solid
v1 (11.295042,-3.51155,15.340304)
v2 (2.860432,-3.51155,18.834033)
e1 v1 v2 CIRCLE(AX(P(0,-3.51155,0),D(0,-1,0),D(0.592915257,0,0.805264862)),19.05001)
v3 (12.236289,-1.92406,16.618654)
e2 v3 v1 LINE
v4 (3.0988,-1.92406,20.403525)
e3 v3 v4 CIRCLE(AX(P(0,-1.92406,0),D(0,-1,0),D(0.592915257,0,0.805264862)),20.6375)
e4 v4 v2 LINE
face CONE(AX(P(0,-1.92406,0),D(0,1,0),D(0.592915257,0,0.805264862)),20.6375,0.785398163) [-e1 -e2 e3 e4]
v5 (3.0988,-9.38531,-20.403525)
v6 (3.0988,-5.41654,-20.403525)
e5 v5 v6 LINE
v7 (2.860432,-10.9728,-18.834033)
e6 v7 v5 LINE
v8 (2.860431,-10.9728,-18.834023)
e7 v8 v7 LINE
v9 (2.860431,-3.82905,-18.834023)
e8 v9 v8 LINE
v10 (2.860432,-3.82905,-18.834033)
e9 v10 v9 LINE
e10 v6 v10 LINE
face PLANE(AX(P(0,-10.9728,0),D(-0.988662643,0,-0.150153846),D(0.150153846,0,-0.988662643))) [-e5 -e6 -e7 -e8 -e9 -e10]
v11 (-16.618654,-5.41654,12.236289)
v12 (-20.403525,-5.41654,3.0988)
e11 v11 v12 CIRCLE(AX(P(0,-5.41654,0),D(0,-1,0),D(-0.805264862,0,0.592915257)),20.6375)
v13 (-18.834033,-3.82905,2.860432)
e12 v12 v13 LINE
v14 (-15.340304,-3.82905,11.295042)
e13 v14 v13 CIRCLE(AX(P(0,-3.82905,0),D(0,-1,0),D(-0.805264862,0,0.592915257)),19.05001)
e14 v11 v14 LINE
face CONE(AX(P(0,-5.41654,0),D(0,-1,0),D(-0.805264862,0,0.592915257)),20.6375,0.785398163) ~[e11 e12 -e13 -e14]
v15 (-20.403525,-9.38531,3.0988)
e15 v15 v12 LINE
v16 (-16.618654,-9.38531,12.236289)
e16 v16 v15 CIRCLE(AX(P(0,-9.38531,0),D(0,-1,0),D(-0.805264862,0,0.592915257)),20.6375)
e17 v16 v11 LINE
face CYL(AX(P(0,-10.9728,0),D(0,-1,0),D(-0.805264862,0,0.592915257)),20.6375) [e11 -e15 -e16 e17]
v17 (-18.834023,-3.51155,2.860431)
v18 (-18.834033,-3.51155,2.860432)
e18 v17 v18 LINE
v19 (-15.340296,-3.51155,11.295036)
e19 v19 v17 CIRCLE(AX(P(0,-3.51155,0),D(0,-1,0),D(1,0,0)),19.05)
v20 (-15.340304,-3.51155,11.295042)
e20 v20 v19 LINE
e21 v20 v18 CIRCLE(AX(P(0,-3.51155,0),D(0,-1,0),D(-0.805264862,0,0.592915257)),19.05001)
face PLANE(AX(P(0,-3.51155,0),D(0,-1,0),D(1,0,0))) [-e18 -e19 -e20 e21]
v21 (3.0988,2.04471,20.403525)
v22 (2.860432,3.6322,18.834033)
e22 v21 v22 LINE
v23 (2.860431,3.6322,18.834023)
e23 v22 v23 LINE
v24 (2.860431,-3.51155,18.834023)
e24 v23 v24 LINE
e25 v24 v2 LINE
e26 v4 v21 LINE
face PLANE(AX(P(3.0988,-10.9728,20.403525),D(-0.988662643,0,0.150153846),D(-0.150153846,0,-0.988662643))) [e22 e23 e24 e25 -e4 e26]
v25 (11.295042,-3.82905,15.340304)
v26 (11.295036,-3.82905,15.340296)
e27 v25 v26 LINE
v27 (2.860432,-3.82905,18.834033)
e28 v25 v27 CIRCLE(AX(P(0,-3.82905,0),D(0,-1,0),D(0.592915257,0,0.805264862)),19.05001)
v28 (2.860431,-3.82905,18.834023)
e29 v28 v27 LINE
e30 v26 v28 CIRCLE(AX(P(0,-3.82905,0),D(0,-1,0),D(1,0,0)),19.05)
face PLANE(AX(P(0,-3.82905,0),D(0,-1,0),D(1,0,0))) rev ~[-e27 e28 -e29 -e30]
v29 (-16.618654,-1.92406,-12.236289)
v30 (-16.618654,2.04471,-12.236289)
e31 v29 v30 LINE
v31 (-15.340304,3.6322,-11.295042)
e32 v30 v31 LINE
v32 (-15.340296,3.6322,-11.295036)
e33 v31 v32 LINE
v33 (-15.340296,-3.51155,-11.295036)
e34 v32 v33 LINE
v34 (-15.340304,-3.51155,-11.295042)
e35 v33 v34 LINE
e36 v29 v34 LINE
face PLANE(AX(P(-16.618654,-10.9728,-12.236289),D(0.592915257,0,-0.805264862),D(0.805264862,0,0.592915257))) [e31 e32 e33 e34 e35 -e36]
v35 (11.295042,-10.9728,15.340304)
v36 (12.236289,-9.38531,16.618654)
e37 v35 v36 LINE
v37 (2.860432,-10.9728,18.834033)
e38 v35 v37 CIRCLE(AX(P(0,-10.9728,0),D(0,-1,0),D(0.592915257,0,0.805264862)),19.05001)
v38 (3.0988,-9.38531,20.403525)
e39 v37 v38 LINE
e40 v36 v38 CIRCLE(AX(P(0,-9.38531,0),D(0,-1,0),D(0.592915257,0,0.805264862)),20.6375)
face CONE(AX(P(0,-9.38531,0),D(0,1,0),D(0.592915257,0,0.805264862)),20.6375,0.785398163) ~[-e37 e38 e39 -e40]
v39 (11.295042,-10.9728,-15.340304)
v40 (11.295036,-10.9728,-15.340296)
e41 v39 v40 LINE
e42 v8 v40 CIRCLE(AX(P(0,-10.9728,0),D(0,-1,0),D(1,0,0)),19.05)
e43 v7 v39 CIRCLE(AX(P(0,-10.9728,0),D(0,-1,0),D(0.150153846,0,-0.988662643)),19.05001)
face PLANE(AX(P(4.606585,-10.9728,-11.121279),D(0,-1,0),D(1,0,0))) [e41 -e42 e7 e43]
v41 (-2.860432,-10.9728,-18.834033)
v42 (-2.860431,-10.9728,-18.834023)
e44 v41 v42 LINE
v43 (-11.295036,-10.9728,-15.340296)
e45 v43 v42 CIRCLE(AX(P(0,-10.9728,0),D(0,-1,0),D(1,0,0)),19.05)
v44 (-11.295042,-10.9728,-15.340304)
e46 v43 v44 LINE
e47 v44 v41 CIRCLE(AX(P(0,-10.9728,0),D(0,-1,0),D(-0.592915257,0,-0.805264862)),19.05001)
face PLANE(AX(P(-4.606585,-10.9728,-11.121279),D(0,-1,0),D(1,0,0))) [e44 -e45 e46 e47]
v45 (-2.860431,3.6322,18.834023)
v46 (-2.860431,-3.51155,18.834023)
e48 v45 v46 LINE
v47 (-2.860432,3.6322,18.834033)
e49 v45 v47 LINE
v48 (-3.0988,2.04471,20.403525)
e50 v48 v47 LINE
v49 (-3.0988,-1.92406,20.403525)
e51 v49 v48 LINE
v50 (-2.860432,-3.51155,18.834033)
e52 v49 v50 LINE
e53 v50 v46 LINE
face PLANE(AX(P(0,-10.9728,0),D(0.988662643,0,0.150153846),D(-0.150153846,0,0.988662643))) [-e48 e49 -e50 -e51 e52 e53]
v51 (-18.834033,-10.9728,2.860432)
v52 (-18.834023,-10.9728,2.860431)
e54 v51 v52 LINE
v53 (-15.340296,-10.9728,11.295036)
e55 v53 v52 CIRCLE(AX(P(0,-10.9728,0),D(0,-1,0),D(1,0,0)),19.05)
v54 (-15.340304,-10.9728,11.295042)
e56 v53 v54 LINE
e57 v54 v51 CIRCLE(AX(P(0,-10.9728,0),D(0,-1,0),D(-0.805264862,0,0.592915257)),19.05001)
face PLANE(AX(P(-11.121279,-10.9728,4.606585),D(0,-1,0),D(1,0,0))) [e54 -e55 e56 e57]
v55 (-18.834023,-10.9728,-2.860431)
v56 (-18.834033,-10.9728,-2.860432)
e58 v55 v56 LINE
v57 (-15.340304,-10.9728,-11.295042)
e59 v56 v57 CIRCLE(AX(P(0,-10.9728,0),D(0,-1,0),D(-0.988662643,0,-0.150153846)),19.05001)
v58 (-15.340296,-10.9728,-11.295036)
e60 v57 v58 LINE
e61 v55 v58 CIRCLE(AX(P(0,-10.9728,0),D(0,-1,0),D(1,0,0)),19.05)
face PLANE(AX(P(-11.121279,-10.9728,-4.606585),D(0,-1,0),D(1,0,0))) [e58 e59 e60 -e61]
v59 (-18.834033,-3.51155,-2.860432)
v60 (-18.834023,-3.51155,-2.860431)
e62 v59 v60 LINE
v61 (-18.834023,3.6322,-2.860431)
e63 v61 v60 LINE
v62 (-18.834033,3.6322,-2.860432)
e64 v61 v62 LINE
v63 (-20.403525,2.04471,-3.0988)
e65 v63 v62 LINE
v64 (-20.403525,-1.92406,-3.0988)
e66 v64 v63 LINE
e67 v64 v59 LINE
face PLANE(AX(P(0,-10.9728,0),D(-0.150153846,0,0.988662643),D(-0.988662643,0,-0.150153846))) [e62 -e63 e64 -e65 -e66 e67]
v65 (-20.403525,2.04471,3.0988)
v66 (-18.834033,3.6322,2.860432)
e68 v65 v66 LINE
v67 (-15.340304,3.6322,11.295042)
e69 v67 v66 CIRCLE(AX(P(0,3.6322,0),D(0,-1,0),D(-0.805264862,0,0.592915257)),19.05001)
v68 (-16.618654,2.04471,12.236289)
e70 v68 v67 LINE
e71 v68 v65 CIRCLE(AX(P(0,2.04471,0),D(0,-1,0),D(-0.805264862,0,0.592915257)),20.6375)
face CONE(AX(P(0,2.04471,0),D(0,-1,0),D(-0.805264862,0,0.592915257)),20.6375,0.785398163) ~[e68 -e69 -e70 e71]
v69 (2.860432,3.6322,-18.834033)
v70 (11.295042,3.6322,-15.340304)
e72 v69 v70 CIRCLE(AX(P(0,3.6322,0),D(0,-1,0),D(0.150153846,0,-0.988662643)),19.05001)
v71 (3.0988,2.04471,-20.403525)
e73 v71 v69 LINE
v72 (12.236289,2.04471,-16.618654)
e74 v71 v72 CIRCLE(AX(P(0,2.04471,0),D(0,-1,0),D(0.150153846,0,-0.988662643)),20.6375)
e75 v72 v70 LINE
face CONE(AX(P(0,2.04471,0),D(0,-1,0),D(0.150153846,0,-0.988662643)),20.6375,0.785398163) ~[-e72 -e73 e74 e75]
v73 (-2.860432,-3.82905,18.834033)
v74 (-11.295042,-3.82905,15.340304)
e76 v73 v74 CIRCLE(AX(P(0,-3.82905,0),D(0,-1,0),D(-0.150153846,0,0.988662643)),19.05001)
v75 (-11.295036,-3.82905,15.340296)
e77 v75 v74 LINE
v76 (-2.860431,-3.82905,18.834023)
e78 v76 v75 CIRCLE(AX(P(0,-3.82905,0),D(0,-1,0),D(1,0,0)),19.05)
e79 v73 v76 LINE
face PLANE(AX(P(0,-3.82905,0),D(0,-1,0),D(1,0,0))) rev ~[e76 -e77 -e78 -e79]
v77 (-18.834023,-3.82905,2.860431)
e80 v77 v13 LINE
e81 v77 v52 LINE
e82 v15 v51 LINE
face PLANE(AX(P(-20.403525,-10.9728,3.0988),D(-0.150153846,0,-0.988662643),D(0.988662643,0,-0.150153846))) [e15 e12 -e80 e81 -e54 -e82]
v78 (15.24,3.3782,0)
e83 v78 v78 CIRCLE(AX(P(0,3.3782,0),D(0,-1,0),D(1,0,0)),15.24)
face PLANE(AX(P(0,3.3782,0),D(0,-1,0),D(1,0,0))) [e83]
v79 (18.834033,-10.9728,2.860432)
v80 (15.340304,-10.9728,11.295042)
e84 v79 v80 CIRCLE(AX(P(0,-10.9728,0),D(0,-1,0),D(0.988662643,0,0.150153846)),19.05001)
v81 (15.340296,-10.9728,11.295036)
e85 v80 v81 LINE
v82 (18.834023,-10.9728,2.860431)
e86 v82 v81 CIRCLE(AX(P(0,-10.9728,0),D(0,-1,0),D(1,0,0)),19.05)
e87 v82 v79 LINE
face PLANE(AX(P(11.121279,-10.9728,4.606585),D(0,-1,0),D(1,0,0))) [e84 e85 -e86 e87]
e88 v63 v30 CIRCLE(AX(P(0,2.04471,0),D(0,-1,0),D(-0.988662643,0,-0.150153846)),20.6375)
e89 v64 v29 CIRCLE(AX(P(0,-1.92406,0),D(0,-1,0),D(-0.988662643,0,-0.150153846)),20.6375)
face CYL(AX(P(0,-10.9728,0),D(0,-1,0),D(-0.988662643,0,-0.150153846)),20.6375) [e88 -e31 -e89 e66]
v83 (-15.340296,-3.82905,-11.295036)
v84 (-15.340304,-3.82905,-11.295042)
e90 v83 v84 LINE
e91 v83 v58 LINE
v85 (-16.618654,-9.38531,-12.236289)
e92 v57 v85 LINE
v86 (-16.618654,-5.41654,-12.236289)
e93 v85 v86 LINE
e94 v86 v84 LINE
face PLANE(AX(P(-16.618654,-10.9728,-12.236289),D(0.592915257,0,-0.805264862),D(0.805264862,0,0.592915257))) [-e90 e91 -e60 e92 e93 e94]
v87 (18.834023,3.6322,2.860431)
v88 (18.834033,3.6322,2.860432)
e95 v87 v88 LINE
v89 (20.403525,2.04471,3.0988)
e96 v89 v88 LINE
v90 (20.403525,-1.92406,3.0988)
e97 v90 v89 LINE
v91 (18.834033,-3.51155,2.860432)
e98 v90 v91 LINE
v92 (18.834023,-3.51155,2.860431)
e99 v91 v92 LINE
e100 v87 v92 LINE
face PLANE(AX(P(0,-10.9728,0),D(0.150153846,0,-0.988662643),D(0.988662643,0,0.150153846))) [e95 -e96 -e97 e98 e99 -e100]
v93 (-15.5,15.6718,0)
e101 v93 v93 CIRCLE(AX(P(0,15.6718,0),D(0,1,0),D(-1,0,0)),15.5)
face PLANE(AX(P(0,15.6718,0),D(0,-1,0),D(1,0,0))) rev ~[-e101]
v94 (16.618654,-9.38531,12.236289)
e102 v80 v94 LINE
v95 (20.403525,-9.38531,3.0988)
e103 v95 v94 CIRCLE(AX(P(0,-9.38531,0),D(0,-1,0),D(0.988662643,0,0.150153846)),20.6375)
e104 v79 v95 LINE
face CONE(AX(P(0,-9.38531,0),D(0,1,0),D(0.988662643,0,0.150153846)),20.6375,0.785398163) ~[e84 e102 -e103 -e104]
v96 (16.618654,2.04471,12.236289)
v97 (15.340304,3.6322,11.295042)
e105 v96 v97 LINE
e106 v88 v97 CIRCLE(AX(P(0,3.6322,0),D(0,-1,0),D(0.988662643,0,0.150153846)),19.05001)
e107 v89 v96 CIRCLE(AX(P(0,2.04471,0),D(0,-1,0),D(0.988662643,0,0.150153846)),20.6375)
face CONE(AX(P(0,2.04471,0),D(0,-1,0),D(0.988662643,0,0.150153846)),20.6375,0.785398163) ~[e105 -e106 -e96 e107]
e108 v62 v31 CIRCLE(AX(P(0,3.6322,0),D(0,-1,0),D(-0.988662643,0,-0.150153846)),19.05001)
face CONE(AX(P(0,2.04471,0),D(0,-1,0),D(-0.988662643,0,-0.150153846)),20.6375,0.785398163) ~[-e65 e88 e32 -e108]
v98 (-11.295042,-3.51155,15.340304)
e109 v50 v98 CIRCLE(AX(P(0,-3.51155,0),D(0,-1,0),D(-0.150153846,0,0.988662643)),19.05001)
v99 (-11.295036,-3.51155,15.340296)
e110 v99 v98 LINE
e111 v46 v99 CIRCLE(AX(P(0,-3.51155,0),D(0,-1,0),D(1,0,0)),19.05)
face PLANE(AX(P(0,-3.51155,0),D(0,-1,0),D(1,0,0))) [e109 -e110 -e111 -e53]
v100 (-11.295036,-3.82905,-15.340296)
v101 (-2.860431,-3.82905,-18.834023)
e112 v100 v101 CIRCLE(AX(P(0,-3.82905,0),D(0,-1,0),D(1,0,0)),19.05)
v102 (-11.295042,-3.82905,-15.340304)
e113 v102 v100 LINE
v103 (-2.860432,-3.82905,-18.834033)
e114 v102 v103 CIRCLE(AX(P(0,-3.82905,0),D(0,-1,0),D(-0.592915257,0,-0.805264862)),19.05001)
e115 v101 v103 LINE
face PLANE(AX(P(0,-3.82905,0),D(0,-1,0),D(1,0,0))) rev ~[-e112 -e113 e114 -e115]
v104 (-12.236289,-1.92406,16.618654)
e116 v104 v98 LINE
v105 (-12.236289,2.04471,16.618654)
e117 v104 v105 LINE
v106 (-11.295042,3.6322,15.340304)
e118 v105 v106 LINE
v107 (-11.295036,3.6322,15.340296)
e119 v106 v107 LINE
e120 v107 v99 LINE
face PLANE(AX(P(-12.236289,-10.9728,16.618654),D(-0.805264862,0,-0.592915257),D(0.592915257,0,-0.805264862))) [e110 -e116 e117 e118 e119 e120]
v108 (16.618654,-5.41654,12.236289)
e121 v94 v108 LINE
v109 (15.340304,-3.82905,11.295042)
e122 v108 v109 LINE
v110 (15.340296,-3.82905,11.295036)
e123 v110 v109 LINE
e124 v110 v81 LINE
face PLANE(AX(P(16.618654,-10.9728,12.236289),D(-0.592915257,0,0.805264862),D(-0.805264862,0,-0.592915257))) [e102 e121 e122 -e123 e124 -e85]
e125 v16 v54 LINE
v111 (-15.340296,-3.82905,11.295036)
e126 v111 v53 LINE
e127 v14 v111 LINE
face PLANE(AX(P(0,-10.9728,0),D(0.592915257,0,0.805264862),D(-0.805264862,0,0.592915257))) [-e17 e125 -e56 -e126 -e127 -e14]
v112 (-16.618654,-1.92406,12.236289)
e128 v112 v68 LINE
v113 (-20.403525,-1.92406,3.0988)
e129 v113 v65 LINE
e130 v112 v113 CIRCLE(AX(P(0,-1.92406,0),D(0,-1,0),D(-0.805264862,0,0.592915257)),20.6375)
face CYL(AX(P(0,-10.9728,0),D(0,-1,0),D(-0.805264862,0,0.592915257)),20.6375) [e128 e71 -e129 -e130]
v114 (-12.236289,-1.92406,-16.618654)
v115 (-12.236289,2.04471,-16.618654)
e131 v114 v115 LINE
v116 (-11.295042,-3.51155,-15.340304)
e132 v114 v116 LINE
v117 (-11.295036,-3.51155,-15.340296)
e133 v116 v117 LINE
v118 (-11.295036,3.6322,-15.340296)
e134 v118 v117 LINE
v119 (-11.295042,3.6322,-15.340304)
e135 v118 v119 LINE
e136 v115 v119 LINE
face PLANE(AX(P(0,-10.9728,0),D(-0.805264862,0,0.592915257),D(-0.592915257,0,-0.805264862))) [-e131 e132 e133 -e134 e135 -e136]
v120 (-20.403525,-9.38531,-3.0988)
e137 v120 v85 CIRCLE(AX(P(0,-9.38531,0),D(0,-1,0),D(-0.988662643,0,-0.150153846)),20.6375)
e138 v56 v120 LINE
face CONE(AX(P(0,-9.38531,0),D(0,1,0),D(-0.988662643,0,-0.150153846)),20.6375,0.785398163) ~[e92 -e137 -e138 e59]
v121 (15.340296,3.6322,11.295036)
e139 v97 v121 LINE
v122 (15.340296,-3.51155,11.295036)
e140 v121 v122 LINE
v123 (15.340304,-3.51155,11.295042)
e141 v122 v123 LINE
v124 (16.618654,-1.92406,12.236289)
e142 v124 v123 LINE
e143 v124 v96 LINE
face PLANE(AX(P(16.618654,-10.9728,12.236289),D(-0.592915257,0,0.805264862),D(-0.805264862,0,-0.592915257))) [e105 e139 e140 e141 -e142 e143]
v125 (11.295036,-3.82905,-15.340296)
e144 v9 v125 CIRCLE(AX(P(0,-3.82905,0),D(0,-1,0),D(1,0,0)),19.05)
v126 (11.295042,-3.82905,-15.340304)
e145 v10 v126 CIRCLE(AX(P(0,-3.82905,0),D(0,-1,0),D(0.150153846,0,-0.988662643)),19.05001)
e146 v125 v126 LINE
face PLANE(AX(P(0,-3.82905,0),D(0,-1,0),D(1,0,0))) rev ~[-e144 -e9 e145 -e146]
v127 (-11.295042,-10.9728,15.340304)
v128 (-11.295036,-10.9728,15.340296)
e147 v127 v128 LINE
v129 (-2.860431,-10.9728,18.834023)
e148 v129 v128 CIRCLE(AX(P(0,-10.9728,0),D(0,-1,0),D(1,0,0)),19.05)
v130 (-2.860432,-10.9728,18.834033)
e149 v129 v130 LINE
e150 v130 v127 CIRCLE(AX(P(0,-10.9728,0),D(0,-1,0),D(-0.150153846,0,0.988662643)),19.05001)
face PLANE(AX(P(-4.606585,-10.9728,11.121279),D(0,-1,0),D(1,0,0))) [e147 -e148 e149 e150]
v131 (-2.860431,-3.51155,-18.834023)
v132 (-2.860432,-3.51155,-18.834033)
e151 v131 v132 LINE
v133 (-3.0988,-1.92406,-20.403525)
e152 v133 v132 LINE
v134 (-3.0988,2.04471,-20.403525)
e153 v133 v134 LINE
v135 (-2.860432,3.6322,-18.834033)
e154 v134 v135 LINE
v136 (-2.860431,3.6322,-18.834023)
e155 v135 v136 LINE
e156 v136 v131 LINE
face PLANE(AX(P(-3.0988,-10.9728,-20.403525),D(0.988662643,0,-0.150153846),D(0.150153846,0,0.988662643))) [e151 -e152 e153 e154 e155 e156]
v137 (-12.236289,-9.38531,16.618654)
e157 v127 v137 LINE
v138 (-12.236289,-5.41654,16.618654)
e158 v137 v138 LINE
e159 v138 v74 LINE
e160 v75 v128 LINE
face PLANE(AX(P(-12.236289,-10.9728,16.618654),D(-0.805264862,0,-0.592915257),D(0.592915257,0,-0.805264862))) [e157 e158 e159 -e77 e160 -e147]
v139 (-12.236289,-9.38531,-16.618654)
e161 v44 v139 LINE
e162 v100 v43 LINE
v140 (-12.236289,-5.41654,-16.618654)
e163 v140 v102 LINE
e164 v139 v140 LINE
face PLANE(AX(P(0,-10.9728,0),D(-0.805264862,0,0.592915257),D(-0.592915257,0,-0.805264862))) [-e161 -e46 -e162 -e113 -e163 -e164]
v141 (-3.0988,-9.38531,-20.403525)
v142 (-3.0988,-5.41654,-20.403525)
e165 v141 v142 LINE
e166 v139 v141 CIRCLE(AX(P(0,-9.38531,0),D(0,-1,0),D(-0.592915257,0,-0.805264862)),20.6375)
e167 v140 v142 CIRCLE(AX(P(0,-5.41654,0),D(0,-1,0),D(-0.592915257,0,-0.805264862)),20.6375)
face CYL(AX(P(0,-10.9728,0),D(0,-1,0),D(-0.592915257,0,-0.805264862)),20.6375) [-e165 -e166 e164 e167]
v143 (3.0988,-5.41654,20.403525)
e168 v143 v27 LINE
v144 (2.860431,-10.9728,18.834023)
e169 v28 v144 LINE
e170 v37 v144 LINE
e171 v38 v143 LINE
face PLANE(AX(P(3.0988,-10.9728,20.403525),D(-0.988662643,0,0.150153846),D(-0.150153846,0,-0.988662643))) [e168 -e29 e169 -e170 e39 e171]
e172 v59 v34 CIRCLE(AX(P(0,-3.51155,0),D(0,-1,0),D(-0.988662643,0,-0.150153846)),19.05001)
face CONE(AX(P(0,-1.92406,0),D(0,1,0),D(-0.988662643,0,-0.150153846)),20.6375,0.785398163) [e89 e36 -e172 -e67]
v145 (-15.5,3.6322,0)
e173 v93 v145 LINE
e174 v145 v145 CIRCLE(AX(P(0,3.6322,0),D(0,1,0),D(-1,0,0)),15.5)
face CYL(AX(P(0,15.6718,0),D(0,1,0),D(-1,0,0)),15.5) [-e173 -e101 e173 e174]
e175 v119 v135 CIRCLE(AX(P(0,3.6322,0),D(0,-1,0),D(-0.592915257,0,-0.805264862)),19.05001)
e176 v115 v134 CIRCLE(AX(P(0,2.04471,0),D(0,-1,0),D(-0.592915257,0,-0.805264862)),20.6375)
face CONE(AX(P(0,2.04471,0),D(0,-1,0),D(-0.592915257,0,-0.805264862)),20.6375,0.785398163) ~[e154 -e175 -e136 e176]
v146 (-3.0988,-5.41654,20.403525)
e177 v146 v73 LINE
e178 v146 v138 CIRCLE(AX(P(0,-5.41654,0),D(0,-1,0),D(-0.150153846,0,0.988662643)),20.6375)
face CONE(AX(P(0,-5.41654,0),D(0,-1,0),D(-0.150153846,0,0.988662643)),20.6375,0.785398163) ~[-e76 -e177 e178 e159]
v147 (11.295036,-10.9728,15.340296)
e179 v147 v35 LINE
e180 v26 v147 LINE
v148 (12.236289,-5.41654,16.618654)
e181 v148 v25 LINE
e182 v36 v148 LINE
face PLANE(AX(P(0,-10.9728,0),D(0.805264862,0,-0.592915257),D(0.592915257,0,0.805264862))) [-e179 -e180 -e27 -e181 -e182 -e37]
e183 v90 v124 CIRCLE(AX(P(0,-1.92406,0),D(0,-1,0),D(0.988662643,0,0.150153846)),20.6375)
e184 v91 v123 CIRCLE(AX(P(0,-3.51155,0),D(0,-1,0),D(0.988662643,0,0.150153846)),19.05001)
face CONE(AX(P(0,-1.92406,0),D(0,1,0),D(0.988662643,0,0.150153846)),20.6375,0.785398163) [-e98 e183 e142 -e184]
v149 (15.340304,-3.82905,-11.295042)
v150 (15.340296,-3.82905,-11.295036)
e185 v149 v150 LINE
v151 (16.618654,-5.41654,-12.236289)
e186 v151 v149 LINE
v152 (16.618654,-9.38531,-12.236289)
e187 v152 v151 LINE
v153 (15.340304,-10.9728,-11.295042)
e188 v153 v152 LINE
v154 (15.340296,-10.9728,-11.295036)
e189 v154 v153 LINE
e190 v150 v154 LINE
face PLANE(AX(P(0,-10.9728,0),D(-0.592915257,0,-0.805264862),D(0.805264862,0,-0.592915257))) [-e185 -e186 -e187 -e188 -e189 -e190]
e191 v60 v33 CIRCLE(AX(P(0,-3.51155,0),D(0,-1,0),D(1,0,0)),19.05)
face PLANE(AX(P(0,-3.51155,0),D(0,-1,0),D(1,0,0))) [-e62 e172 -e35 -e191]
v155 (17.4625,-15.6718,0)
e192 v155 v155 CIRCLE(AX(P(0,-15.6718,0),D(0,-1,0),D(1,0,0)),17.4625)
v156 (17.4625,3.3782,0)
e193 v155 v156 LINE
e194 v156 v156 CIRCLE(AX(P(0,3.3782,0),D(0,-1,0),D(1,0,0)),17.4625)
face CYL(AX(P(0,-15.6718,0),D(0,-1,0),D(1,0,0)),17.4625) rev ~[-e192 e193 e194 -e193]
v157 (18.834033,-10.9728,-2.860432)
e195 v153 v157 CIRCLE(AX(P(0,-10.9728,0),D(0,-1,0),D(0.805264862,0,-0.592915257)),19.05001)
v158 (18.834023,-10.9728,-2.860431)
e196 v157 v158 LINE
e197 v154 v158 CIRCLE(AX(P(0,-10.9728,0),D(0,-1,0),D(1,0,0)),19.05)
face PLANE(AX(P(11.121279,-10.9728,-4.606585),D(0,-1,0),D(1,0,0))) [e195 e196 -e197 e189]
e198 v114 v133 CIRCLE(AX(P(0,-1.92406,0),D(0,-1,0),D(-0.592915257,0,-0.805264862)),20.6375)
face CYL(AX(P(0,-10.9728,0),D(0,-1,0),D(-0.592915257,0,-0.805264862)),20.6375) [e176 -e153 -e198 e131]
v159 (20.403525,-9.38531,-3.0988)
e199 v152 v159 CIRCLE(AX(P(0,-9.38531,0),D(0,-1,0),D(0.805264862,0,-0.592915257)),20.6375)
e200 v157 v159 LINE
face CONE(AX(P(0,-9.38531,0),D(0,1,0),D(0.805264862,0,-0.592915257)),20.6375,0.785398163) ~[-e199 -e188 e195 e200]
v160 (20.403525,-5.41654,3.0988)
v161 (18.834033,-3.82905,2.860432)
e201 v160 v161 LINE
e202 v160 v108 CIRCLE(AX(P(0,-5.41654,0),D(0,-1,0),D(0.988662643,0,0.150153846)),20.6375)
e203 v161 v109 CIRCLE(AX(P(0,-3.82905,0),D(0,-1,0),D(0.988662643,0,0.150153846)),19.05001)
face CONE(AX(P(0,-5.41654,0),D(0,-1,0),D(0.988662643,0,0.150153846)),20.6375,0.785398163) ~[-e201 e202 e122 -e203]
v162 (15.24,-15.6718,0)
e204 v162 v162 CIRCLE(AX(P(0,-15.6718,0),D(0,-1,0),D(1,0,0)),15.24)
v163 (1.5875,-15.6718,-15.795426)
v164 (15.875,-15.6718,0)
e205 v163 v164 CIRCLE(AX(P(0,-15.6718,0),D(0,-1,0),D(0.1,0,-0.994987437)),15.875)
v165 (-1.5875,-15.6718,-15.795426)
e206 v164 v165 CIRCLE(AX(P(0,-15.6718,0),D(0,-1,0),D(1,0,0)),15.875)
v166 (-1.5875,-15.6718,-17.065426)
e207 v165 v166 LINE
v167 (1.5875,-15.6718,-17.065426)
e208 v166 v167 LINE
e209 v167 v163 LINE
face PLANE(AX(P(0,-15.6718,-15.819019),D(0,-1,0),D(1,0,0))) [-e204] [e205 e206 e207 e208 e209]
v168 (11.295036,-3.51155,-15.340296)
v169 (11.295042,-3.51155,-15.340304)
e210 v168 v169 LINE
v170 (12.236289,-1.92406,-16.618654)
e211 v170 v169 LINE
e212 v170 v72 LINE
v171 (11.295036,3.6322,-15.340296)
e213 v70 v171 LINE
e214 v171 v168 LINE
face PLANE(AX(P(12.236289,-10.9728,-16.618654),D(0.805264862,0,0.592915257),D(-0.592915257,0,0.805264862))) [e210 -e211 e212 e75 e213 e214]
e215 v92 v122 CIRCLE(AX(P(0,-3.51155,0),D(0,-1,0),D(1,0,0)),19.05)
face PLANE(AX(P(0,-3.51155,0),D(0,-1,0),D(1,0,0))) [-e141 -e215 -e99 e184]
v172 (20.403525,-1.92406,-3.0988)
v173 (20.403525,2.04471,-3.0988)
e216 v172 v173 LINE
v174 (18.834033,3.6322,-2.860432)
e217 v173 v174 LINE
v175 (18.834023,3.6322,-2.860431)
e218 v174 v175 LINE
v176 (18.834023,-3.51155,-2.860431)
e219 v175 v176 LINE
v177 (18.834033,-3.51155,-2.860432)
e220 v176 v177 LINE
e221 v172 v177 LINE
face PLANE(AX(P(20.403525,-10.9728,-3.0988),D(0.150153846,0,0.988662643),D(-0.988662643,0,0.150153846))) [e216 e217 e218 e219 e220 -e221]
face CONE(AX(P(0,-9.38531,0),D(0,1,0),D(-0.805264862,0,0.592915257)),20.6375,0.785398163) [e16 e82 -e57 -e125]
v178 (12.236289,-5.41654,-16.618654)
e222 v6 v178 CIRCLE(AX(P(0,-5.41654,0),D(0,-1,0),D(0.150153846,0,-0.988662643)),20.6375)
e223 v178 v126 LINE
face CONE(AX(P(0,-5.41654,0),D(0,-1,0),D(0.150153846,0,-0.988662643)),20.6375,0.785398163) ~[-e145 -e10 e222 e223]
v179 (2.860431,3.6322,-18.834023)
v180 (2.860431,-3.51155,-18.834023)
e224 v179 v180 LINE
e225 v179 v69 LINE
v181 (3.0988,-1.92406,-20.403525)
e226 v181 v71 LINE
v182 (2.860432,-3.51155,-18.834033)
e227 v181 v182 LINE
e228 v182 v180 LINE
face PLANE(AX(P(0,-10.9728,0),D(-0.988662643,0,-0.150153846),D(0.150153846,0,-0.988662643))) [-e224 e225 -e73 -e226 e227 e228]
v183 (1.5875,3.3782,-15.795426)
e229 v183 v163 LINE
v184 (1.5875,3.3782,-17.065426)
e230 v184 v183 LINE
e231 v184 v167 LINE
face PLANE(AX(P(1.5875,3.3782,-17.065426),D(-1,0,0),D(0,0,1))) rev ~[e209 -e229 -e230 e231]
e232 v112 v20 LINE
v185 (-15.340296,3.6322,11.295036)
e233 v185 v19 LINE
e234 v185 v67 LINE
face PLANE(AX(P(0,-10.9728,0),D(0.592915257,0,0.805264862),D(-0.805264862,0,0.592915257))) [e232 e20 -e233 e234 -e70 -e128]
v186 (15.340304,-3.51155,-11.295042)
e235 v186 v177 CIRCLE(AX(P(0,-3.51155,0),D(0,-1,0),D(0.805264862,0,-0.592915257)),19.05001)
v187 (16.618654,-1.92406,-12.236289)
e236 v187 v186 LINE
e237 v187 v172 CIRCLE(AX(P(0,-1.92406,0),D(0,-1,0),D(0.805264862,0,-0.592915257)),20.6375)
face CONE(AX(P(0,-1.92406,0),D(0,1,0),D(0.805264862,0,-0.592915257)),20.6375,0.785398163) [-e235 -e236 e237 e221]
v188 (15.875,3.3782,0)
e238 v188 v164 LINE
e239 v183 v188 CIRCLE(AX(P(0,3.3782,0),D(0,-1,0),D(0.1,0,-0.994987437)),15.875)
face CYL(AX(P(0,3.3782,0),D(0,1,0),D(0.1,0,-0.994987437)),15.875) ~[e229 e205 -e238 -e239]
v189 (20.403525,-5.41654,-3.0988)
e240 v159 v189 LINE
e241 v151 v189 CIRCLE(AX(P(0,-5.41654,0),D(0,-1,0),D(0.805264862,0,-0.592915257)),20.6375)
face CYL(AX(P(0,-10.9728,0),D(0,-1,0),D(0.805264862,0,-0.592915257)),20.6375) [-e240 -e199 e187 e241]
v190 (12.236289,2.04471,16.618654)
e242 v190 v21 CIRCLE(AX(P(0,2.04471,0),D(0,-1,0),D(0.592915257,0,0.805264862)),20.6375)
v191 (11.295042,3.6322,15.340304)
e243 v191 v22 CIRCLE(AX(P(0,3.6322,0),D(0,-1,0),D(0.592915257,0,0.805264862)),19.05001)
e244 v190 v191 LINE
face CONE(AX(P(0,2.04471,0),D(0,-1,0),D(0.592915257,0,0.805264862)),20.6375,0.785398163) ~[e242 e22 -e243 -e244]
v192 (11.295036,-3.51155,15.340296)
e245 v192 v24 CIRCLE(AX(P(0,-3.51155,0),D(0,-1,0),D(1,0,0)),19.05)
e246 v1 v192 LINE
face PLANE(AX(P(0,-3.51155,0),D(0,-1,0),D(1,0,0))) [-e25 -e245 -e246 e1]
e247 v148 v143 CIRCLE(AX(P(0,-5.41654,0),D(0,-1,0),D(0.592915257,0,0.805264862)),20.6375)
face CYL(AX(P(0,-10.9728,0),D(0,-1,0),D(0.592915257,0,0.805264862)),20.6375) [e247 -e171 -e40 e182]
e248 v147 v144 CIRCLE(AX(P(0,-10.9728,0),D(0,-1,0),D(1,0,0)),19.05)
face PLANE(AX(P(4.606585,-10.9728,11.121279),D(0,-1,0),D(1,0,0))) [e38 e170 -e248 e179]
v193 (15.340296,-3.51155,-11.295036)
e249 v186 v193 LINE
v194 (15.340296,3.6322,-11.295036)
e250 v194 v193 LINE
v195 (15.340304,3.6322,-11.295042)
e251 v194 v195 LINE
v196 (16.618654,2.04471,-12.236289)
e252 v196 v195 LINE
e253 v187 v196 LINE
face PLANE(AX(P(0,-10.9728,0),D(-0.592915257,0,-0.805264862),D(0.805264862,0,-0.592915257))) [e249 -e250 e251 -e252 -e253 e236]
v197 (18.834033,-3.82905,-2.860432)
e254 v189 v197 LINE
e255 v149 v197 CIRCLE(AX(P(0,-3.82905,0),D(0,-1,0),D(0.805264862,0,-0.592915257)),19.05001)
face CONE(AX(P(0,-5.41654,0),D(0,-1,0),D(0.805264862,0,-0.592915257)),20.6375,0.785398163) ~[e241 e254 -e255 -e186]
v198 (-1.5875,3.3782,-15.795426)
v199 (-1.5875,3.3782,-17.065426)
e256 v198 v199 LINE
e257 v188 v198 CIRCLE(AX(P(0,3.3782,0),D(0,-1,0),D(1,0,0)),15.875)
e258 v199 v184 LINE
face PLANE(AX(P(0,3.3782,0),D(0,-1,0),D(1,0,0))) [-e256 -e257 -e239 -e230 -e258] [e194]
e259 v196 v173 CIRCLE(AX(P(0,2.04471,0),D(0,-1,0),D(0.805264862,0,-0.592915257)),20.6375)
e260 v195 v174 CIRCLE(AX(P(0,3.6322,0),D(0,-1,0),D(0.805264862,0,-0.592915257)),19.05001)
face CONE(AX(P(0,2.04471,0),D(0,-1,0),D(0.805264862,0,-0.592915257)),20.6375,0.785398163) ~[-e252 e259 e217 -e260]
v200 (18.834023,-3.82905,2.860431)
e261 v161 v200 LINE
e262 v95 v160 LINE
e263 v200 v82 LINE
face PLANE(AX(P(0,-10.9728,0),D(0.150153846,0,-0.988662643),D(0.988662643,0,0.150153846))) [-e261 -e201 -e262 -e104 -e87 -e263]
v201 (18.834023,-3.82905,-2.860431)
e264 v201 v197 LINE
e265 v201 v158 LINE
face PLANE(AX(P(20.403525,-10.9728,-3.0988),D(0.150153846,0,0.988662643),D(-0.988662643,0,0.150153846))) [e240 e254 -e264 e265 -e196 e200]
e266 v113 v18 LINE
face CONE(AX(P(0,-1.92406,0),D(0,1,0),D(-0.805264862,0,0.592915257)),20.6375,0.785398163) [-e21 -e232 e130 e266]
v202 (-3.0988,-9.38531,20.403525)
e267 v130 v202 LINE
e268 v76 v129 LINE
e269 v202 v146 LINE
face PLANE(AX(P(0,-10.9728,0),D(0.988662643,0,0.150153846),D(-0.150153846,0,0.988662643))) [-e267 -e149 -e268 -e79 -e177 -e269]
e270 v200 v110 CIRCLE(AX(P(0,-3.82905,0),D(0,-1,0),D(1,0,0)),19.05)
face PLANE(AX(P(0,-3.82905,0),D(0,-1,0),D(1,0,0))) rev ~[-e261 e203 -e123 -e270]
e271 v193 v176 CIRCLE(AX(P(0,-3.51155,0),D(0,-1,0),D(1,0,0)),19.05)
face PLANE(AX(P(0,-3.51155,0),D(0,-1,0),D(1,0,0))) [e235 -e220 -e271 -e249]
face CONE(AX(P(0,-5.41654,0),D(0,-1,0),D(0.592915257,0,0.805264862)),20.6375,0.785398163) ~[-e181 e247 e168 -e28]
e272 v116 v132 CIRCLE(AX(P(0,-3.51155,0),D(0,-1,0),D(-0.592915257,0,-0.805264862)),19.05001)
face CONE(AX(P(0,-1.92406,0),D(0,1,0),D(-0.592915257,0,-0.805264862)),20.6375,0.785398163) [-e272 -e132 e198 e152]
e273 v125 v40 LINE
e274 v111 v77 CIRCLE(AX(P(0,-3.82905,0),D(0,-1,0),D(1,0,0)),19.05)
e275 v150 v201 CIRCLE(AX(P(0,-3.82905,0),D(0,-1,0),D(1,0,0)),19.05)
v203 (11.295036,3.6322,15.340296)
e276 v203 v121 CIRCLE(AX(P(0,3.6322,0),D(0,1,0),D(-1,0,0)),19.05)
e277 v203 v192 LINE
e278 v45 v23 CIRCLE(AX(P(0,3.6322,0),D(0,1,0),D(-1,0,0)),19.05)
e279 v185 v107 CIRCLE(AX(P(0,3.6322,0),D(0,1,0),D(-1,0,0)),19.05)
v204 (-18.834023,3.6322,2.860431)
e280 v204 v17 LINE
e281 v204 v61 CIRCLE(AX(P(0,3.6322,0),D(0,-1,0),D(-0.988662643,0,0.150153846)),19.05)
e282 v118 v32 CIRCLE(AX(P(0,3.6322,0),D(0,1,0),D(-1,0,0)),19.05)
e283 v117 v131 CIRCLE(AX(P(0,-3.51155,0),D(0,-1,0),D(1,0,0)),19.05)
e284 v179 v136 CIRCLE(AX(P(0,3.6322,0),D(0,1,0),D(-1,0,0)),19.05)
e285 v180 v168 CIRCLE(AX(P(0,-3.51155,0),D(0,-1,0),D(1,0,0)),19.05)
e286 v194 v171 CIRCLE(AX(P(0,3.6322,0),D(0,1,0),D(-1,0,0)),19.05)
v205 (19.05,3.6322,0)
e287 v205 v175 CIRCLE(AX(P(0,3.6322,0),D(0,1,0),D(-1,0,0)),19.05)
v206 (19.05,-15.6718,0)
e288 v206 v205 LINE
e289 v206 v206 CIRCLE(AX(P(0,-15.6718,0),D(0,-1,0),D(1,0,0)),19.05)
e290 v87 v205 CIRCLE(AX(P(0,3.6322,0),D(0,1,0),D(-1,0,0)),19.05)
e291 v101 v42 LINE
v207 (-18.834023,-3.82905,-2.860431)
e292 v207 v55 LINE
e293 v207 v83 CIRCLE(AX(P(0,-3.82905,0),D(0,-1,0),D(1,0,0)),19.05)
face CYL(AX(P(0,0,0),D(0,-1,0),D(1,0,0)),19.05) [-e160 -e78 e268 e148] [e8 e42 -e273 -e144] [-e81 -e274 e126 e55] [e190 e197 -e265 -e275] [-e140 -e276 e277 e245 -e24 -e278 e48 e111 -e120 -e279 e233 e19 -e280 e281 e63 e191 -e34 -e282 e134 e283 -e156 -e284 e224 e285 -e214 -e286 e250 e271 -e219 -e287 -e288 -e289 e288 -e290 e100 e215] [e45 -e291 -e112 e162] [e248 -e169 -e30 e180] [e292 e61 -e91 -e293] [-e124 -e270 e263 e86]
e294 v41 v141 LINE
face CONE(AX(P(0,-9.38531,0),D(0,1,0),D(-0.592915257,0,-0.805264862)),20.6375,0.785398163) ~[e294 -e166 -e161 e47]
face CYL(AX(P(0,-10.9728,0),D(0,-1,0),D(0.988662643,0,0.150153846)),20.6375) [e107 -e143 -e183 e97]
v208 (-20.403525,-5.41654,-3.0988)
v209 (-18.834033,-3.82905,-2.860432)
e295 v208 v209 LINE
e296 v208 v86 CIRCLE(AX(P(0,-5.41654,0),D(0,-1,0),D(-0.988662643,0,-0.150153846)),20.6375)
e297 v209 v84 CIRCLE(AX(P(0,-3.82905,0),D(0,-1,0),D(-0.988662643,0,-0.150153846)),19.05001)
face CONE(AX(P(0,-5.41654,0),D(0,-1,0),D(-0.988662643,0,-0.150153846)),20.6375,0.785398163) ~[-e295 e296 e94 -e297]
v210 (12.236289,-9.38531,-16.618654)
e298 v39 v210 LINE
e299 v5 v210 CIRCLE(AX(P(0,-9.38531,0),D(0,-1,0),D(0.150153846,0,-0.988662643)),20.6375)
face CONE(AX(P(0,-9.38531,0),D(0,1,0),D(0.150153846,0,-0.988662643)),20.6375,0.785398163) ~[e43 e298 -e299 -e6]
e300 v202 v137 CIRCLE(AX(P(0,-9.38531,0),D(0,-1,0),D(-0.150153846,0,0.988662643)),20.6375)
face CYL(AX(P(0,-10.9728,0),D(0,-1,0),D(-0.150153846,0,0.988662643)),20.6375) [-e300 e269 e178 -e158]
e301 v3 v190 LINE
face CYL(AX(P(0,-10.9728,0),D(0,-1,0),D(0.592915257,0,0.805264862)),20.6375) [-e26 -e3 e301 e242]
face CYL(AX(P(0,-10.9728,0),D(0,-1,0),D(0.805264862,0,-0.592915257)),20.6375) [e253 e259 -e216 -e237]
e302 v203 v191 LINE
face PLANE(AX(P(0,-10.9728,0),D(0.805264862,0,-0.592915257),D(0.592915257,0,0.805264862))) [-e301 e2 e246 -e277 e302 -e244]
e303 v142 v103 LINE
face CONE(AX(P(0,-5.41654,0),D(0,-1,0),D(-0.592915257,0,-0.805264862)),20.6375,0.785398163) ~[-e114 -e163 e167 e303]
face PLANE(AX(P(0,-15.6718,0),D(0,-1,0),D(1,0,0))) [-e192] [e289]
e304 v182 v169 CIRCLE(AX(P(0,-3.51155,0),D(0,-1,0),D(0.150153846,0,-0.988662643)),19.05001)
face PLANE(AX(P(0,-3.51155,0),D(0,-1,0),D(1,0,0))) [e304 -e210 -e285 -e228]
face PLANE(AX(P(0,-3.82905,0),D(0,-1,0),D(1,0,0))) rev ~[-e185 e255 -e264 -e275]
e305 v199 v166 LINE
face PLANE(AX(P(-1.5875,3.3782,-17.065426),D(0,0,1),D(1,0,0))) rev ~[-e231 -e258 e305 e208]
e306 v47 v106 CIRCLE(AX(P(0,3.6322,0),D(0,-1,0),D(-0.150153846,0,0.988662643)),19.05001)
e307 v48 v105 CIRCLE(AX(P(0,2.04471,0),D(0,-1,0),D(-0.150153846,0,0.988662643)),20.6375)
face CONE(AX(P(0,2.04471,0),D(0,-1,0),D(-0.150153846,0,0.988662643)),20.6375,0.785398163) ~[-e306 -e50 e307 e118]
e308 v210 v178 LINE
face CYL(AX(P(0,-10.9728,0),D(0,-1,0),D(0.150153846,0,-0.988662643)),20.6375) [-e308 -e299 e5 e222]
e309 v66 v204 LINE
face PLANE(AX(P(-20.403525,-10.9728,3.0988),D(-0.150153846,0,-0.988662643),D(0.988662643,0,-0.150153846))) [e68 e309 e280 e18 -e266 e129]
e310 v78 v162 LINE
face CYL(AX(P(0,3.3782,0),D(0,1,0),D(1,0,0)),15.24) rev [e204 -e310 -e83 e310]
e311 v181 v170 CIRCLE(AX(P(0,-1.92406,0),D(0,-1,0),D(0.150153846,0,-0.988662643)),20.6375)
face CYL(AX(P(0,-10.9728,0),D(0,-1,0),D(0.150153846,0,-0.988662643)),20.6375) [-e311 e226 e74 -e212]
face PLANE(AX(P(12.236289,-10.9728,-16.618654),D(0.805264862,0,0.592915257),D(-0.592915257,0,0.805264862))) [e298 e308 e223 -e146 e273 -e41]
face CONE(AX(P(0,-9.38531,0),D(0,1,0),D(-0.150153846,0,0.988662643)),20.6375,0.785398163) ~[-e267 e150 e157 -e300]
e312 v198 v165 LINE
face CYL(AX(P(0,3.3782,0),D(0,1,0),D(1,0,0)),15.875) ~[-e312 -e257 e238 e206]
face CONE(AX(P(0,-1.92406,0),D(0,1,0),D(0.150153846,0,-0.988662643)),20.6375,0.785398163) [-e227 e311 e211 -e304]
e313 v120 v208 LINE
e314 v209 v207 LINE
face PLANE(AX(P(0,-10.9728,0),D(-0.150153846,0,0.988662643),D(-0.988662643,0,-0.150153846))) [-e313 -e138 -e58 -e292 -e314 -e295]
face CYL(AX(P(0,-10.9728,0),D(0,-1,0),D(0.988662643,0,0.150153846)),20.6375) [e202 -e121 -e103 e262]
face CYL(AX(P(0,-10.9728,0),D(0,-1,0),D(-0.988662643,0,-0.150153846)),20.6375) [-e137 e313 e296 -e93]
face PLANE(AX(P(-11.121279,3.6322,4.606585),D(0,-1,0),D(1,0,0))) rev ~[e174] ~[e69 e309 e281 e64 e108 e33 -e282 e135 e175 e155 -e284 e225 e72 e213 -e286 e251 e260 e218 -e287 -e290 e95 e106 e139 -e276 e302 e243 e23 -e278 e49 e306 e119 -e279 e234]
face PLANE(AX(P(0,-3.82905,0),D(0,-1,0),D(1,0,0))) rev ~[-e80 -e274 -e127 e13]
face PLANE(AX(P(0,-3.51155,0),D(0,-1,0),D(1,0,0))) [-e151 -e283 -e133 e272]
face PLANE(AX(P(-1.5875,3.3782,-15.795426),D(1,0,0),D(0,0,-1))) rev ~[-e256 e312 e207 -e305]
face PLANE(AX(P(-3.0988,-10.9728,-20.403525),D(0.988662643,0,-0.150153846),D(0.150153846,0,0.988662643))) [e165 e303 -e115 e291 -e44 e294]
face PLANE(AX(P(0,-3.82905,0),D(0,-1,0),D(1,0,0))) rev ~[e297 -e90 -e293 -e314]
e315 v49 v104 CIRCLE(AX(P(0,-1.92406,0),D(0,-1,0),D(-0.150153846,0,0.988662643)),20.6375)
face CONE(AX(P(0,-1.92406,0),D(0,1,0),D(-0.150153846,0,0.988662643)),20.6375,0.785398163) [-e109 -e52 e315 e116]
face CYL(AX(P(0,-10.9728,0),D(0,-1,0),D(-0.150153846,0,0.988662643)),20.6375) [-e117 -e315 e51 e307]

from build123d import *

# Parameters (mm, degrees)
F0_R      = 19.05
F1_DEPTH  = 15.6718
F4_DEPTH  = 14.605
F5_R      = 17.4625
F6_DEPTH  = 19.05
F7_R      = 19.05
F7_R_2    = 15.5
F8_DEPTH  = 12.0396
F10_R     = 20.6375
F10_R_2   = 19.05
F11_DEPTH = 0.15875
F12_SIZE  = 1.58749
F13_R     = 15.24
F14_DEPTH = 19.05


# Not quite as in the source:
# - a fillet or chamfer is up to 0.001 mm smaller than in the source, because OpenCascade refuses the exact size


with BuildPart() as f1:
    # F0 (on Front) → F1 (new body, symmetric)
    with BuildSketch(Plane.XZ):
        Circle(F0_R)
    extrude(amount=F1_DEPTH, both=True)

    # F3 (on offset) → F4 (join)
    with BuildSketch(Plane.XZ.offset(10.9728)):
        with BuildLine():
            Line((-20.4035253035, 3.0988), (0, 0))
            Line((0, 0), (-16.6186535957, 12.2362886087))
            ThreePointArc((-16.6186535957, 12.2362886087), (-19.0665638522, 7.8976293354), (-20.4035253035, 3.0988))
        make_face()
        with BuildLine():
            Line((-12.2362886087, 16.6186535957), (0, 0))
            Line((0, 0), (-3.0988, 20.4035253035))
            ThreePointArc((-3.0988, 20.4035253035), (-7.8976293354, 19.0665638522), (-12.2362886087, 16.6186535957))
        make_face()
        with BuildLine():
            Line((3.0988, 20.4035253035), (0, 0))
            Line((0, 0), (12.2362886087, 16.6186535957))
            ThreePointArc((12.2362886087, 16.6186535957), (7.8976293354, 19.0665638522), (3.0988, 20.4035253035))
        make_face()
        with BuildLine():
            Line((0, 0), (20.4035253035, 3.0988))
            ThreePointArc((20.4035253035, 3.0988), (19.0665638522, 7.8976293354), (16.6186535957, 12.2362886087))
            Line((16.6186535957, 12.2362886087), (0, 0))
        make_face()
        with BuildLine():
            ThreePointArc((16.6186535957, -12.2362886087), (19.0665638522, -7.8976293354), (20.4035253035, -3.0988))
            Line((20.4035253035, -3.0988), (0, 0))
            Line((0, 0), (16.6186535957, -12.2362886087))
        make_face()
        with BuildLine():
            Line((12.2362886087, -16.6186535957), (0, 0))
            Line((0, 0), (3.0988, -20.4035253035))
            ThreePointArc((3.0988, -20.4035253035), (7.8976293354, -19.0665638522), (12.2362886087, -16.6186535957))
        make_face()
        with BuildLine():
            Line((-3.0988, -20.4035253035), (0, 0))
            Line((0, 0), (-12.2362886087, -16.6186535957))
            ThreePointArc((-12.2362886087, -16.6186535957), (-7.8976293354, -19.0665638522), (-3.0988, -20.4035253035))
        make_face()
        with BuildLine():
            Line((-16.6186535957, -12.2362886087), (0, 0))
            Line((0, 0), (-20.4035253035, -3.0988))
            ThreePointArc((-20.4035253035, -3.0988), (-19.0665638522, -7.8976293354), (-16.6186535957, -12.2362886087))
        make_face()
    extrude(amount=-F4_DEPTH)

    # F5 (on face) → F6 (cut)
    with BuildSketch(Plane.XZ.offset(15.6718)):
        Circle(F5_R)
    extrude(amount=-F6_DEPTH, mode=Mode.SUBTRACT)

    # F7 (on face) → F8 (cut)
    with BuildSketch(Plane(origin=(0, 15.6718, 0), x_dir=(-1, 0, 0), z_dir=(0, 1, 0))):
        Circle(F7_R)
        Circle(F7_R_2, mode=Mode.SUBTRACT)
    extrude(amount=-F8_DEPTH, mode=Mode.SUBTRACT)

    # F10 (on offset) → F11 (cut, symmetric)
    with BuildSketch(Plane.XZ.offset(3.6703)):
        Circle(F10_R)
        Circle(F10_R_2, mode=Mode.SUBTRACT)
    extrude(amount=F11_DEPTH, both=True, mode=Mode.SUBTRACT)

    # F12 (size 1.5875 in the source; OpenCascade refuses exactly that, so slightly less here)
    f12_edges = [f1.edges().sort_by_distance(p)[0] for p in [
        (-7.897629, -3.51155, 19.066564),
        (-7.897629, -3.82905, 19.066564),
        (-7.897629, -10.9728, 19.066564),
        (-7.897629, 3.6322, 19.066564),
        (-19.066564, 3.6322, 7.897629),
        (-19.066564, -3.51155, 7.897629),
        (-19.066564, -3.82905, 7.897629),
        (-19.066564, -10.9728, 7.897629),
        (-19.066564, -10.9728, -7.897629),
        (-19.066564, -3.82905, -7.897629),
        (-19.066564, -3.51155, -7.897629),
        (-19.066564, 3.6322, -7.897629),
        (-7.897629, -10.9728, -19.066564),
        (-7.897629, -3.82905, -19.066564),
        (-7.897629, -3.51155, -19.066564),
        (-7.897629, 3.6322, -19.066564),
        (7.897629, -3.82905, -19.066564),
        (7.897629, -10.9728, -19.066564),
        (7.897629, -3.51155, -19.066564),
        (7.897629, 3.6322, -19.066564),
        (19.066564, 3.6322, -7.897629),
        (19.066564, -3.51155, -7.897629),
        (19.066564, -3.82905, -7.897629),
        (19.066564, -10.9728, -7.897629),
        (19.066564, 3.6322, 7.897629),
        (19.066564, -3.51155, 7.897629),
        (19.066564, -3.82905, 7.897629),
        (19.066564, -10.9728, 7.897629),
        (7.897629, 3.6322, 19.066564),
        (7.897629, -3.51155, 19.066564),
        (7.897629, -3.82905, 19.066564),
        (7.897629, -10.9728, 19.066564),
    ]]
    chamfer(f12_edges, length=F12_SIZE)

    # F13 (on face) → F14 (join)
    with BuildSketch(Plane.XZ.offset(-3.3782)):
        with BuildLine():
            Line((1.5875, -15.7954255641), (-1.5875, -15.7954255641))
            ThreePointArc((-1.5875, -15.7954255641), (0, -15.875), (1.5875, -15.7954255641))
        make_face()
        with BuildLine():
            ThreePointArc((1.5875, -15.7954255641), (11.7732150983, -10.6492737428), (15.875, 0))
            ThreePointArc((15.875, 0), (-10.6492737428, 11.7732150983), (-1.5875, -15.7954255641))
            Line((-1.5875, -15.7954255641), (1.5875, -15.7954255641))
        make_face()
        Circle(F13_R, mode=Mode.SUBTRACT)
        with BuildLine():
            ThreePointArc((1.5875, -15.7954255641), (0, -15.875), (-1.5875, -15.7954255641))
            Line((-1.5875, -15.7954255641), (-1.5875, -17.0654255641))
            Line((-1.5875, -17.0654255641), (1.5875, -17.0654255641))
            Line((1.5875, -17.0654255641), (1.5875, -15.7954255641))
        make_face()
    extrude(amount=F14_DEPTH)


solid = f1.part
